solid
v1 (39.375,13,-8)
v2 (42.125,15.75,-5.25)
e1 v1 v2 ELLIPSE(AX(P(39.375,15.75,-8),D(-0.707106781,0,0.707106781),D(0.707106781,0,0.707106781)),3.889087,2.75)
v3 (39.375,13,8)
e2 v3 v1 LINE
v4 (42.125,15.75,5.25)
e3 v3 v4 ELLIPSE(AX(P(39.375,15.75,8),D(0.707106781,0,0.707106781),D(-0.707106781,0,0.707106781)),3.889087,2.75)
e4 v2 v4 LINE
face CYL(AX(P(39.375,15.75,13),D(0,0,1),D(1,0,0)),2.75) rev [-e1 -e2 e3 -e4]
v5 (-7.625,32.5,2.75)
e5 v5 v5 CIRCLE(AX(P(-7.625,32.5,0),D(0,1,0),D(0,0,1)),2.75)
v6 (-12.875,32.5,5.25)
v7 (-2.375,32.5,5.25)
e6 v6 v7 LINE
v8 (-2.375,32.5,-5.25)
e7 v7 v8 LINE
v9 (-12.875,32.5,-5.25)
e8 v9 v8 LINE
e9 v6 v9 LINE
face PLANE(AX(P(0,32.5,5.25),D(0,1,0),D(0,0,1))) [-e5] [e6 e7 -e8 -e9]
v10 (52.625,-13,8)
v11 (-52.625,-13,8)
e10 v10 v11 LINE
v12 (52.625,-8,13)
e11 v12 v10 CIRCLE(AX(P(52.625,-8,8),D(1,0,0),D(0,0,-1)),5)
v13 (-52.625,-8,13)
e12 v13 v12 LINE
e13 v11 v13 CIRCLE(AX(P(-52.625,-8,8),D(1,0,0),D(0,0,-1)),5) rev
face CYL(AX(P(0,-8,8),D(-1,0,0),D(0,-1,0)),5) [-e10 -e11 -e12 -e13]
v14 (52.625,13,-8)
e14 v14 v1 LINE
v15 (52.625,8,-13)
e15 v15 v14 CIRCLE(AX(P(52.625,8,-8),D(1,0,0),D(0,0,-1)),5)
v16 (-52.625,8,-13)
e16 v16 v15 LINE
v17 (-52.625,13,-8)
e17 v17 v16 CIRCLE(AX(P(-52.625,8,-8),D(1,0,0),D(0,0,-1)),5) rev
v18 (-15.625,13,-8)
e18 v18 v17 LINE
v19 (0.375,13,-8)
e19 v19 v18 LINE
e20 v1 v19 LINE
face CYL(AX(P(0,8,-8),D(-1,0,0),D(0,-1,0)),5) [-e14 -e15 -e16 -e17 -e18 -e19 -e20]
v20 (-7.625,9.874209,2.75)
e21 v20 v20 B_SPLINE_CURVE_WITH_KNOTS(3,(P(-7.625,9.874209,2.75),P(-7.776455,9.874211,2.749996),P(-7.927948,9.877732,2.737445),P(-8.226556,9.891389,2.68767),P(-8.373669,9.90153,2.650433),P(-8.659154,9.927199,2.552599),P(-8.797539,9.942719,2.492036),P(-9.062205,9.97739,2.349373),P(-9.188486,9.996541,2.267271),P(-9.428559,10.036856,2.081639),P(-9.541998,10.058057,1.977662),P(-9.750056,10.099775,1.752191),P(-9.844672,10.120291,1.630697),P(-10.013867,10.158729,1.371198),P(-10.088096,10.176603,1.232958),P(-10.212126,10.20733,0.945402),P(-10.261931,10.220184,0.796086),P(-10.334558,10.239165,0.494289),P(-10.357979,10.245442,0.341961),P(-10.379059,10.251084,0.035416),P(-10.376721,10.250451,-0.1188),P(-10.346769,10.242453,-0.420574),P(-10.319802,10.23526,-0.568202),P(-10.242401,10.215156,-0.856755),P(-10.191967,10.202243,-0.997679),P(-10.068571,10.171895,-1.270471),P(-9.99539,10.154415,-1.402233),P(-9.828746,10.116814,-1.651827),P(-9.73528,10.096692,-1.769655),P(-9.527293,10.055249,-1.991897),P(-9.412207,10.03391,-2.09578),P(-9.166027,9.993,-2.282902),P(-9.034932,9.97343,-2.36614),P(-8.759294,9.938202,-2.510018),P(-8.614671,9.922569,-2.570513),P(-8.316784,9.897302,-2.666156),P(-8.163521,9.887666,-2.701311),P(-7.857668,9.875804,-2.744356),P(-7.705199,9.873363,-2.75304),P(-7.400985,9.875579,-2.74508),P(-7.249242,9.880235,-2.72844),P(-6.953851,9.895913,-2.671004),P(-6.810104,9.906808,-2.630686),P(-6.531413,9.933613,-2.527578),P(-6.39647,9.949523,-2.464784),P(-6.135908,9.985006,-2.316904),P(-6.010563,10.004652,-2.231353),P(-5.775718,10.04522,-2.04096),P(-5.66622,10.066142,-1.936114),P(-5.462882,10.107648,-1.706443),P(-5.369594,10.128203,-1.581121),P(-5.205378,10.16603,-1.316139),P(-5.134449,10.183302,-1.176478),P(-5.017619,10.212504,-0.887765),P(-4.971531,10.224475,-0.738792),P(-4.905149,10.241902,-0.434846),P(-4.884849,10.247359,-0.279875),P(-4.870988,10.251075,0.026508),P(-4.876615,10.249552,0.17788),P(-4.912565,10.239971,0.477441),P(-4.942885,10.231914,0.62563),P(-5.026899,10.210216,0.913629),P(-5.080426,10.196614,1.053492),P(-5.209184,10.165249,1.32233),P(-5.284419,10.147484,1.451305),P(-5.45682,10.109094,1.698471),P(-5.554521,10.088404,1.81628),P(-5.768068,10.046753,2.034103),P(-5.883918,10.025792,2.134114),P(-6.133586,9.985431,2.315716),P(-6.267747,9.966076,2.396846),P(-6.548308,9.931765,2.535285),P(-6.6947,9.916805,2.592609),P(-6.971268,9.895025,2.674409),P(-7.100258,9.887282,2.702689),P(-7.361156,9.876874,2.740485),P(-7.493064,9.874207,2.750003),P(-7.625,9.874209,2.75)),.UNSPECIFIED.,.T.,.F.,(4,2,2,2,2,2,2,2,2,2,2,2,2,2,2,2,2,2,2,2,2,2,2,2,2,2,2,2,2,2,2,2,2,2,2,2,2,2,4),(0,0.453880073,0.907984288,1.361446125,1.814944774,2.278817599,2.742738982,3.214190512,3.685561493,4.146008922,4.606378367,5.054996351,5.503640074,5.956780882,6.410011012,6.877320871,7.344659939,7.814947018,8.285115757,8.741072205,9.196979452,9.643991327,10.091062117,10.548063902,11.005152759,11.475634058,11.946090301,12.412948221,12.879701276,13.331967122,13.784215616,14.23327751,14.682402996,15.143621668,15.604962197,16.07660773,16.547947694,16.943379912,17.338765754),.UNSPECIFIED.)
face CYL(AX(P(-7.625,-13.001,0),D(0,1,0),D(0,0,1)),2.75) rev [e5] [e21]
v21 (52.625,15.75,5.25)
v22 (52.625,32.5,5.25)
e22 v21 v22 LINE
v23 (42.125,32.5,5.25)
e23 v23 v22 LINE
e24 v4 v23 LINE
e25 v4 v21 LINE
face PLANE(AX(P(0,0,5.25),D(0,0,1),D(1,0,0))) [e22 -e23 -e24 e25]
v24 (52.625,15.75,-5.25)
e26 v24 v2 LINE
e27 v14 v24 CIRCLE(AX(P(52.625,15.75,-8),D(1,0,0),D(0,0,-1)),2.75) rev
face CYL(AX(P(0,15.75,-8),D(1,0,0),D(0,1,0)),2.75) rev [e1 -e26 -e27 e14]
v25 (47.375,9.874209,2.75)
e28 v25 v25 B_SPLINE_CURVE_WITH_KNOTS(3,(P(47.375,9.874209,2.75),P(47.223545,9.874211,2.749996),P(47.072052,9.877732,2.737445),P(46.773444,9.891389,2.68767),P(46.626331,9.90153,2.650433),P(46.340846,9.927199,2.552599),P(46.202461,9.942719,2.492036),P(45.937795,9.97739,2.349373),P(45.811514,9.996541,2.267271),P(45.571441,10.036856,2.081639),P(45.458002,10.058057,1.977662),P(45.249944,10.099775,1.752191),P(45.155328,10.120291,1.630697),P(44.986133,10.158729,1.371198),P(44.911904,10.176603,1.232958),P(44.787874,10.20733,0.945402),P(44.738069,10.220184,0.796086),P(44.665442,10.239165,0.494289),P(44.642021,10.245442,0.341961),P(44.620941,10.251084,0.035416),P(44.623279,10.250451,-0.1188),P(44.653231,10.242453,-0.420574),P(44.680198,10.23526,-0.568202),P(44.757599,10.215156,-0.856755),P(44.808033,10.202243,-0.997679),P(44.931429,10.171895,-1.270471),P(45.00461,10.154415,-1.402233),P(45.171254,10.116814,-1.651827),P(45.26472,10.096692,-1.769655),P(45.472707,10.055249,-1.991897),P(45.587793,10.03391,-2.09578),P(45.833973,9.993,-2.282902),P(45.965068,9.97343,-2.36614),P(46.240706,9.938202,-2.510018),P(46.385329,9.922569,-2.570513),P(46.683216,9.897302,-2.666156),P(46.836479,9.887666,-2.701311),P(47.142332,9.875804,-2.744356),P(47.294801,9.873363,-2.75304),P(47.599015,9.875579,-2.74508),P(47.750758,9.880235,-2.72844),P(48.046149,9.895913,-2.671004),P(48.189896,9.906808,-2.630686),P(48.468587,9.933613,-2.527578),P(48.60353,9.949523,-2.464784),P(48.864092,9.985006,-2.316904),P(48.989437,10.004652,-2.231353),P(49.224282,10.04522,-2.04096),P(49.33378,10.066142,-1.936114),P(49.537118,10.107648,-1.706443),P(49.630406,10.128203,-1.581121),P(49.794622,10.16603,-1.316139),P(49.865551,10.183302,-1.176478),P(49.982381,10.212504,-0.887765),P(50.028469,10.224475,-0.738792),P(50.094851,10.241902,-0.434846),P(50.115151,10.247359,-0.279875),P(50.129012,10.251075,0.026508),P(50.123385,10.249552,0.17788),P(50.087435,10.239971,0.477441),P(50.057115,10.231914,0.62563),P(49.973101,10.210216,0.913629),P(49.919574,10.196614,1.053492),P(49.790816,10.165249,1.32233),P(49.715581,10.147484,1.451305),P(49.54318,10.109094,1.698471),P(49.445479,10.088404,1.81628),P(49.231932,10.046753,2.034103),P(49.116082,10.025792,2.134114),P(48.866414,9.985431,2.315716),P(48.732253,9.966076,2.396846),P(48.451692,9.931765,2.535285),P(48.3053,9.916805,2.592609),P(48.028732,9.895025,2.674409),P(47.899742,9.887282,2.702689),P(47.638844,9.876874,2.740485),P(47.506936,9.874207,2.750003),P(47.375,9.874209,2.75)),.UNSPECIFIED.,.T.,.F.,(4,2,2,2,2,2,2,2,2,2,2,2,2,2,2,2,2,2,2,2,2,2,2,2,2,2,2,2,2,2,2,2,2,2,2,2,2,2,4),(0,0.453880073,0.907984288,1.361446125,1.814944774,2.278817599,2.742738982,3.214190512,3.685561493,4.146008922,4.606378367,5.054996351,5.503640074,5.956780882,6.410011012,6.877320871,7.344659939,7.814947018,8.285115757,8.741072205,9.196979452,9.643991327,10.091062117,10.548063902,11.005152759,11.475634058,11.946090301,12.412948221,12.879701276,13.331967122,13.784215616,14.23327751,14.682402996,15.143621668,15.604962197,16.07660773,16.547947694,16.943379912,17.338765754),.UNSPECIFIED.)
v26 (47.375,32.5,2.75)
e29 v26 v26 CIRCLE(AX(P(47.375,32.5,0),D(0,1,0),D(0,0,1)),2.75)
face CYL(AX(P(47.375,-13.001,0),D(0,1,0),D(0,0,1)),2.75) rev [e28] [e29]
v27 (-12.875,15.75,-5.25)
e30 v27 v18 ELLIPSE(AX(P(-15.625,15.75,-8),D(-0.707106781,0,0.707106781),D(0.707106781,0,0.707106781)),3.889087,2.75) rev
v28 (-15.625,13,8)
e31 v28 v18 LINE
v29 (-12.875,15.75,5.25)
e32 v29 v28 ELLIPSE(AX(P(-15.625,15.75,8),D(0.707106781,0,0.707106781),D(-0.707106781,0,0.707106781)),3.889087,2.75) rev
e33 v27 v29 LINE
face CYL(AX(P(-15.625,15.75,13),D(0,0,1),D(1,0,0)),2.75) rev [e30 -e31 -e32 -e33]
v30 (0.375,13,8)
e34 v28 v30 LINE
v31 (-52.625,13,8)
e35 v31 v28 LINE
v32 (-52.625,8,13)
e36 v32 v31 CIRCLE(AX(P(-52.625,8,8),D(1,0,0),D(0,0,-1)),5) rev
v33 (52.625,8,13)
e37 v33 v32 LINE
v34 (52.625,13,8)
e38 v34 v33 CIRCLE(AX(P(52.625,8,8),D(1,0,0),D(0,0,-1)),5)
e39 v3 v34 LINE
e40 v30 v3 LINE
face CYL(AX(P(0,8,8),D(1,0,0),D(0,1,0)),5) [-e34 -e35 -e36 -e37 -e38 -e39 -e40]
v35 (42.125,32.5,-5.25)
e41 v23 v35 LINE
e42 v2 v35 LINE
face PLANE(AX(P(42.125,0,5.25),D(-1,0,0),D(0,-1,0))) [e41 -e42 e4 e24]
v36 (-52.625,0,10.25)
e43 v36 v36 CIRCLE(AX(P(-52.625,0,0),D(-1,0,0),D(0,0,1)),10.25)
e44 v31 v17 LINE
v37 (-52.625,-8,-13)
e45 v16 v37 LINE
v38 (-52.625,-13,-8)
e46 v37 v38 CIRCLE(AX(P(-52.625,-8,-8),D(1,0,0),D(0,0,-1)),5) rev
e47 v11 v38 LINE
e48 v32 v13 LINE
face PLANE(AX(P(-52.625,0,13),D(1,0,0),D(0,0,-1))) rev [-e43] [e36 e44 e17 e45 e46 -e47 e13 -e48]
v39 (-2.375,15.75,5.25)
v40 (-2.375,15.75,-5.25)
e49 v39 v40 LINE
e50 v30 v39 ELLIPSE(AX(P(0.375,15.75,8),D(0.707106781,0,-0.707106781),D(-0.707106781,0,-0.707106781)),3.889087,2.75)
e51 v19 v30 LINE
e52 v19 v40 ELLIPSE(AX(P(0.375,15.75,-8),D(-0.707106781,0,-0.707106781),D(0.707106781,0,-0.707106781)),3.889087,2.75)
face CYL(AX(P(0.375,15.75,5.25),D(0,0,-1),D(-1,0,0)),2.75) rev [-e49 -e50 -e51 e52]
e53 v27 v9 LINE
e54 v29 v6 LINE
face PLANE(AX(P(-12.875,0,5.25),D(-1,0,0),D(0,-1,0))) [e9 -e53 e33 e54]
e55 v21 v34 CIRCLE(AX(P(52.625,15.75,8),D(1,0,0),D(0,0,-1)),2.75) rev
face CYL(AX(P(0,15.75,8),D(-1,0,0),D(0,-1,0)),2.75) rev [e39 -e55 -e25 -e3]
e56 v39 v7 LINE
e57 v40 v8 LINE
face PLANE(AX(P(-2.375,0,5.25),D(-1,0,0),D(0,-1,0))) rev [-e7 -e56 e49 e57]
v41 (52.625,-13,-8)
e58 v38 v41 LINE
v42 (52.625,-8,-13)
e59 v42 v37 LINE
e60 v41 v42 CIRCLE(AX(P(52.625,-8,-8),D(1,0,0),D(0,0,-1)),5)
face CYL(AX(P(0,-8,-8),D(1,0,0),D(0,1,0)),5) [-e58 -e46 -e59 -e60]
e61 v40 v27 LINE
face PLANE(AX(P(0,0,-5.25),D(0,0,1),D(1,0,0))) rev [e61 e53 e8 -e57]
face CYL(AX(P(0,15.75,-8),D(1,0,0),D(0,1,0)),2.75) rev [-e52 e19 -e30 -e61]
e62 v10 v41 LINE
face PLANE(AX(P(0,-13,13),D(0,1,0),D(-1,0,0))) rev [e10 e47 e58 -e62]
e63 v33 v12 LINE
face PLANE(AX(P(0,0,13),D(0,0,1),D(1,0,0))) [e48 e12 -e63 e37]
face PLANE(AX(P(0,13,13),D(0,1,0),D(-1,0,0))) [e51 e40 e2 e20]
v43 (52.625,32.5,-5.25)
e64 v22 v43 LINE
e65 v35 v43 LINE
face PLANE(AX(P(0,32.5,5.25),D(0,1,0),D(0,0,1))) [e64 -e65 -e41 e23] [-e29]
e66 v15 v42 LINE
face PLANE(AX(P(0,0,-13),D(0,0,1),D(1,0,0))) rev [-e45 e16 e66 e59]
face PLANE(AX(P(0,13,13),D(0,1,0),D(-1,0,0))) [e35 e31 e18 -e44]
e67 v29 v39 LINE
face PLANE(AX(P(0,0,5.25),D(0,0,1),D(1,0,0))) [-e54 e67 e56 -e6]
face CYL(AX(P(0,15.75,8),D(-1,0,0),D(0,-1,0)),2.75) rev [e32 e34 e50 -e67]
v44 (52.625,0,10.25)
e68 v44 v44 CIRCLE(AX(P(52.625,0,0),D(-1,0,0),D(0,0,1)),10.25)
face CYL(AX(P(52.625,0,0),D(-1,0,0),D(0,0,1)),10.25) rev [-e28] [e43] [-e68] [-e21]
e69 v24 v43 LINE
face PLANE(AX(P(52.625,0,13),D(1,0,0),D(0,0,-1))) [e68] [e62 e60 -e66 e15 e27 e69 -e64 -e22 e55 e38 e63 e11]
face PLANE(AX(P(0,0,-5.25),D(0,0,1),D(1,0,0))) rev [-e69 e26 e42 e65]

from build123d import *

# Parameters (mm, degrees)
SKETCH1_W               = 105.25
SKETCH1_H               = 26
BOSS_EXTRUDE1_DEPTH     = 13
SKETCH1_3_W             = 10.5
SKETCH1_3_H             = 19.5
BOSS_EXTRUDE2_DEPTH     = 5.25
SKETCH2_R               = 10.25
CUT_EXTRUDE1_DEPTH      = 111.918044069
CUT_EXTRUDE2_REACH      = 72.772
CUT_EXTRUDE2_END_RADIUS = 10.25
SKETCH3_R               = 2.75
FILLET1_R               = 5
FILLET4_R               = 2.75


with BuildPart() as part:
    # Sketch1 → Boss-Extrude1 (new, symmetric)
    with BuildSketch(Plane.XY):
        Rectangle(SKETCH1_W, SKETCH1_H)
    extrude(amount=BOSS_EXTRUDE1_DEPTH, both=True)

    # Sketch1<3> → Boss-Extrude2 (add, symmetric)
    with BuildSketch(Plane.XY):
        with Locations((-7.625, 22.75)):
            Rectangle(SKETCH1_3_W, SKETCH1_3_H)
        with Locations((47.375, 22.75)):
            Rectangle(SKETCH1_3_W, SKETCH1_3_H)
    extrude(amount=BOSS_EXTRUDE2_DEPTH, both=True)

    # Sketch2 → Cut-Extrude1 (cut, through all)
    with BuildSketch(Plane.ZY.offset(52.625)):
        Circle(SKETCH2_R)
    extrude(amount=-CUT_EXTRUDE1_DEPTH, mode=Mode.SUBTRACT)

    # Cut-Extrude2: up to this cylinder (the profile starts outside it)
    cut_extrude2_end = Plane(origin=(19.875, 0, 0), z_dir=(-1, 0, 0)) * Cylinder(CUT_EXTRUDE2_END_RADIUS, 222.044, mode=Mode.PRIVATE)
    # Sketch3 → Cut-Extrude2 (cut, up to the surface)
    with BuildSketch(Plane(origin=(0, 32.5, 0), x_dir=(1, 0, 0), z_dir=(0, 1, 0)), mode=Mode.PRIVATE) as cut_extrude2_sk1:
        with Locations(Location((-7.625, 0, 0), (0, 0, 270))):
            Circle(SKETCH3_R)
    cut_extrude2_tool1 = extrude(cut_extrude2_sk1.sketch, amount=-CUT_EXTRUDE2_REACH, mode=Mode.PRIVATE) - cut_extrude2_end
    add(cut_extrude2_tool1.solids().sort_by_distance((-7.625, 32.5, 0))[0], mode=Mode.SUBTRACT)
    # Sketch3 → Cut-Extrude2 (cut, up to the surface)
    with BuildSketch(Plane(origin=(0, 32.5, 0), x_dir=(1, 0, 0), z_dir=(0, 1, 0)), mode=Mode.PRIVATE) as cut_extrude2_sk2:
        with Locations(Location((47.375, 0, 0), (0, 0, 270))):
            Circle(SKETCH3_R)
    cut_extrude2_tool2 = extrude(cut_extrude2_sk2.sketch, amount=-CUT_EXTRUDE2_REACH, mode=Mode.PRIVATE) - cut_extrude2_end
    add(cut_extrude2_tool2.solids().sort_by_distance((47.375, 32.5, 0))[0], mode=Mode.SUBTRACT)

    # Fillet1
    fillet1_edges = [part.edges().sort_by_distance(p)[0] for p in [
        (0, 13, 13),
        (0, -13, 13),
        (0, -13, -13),
        (0, 13, -13),
    ]]
    fillet(fillet1_edges, radius=FILLET1_R)

    # Fillet4
    fillet4_edges = [part.edges().sort_by_distance(p)[0] for p in [
        (-12.875, 13, 0),
        (42.125, 13, 0),
        (-2.375, 13, 0),
        (47.375, 13, -5.25),
        (47.375, 13, 5.25),
        (-7.625, 13, 5.25),
        (-7.625, 13, -5.25),
    ]]
    fillet(fillet4_edges, radius=FILLET4_R - 0.0001)  # a hair under: the kernel refuses the full size


solid = part.part
